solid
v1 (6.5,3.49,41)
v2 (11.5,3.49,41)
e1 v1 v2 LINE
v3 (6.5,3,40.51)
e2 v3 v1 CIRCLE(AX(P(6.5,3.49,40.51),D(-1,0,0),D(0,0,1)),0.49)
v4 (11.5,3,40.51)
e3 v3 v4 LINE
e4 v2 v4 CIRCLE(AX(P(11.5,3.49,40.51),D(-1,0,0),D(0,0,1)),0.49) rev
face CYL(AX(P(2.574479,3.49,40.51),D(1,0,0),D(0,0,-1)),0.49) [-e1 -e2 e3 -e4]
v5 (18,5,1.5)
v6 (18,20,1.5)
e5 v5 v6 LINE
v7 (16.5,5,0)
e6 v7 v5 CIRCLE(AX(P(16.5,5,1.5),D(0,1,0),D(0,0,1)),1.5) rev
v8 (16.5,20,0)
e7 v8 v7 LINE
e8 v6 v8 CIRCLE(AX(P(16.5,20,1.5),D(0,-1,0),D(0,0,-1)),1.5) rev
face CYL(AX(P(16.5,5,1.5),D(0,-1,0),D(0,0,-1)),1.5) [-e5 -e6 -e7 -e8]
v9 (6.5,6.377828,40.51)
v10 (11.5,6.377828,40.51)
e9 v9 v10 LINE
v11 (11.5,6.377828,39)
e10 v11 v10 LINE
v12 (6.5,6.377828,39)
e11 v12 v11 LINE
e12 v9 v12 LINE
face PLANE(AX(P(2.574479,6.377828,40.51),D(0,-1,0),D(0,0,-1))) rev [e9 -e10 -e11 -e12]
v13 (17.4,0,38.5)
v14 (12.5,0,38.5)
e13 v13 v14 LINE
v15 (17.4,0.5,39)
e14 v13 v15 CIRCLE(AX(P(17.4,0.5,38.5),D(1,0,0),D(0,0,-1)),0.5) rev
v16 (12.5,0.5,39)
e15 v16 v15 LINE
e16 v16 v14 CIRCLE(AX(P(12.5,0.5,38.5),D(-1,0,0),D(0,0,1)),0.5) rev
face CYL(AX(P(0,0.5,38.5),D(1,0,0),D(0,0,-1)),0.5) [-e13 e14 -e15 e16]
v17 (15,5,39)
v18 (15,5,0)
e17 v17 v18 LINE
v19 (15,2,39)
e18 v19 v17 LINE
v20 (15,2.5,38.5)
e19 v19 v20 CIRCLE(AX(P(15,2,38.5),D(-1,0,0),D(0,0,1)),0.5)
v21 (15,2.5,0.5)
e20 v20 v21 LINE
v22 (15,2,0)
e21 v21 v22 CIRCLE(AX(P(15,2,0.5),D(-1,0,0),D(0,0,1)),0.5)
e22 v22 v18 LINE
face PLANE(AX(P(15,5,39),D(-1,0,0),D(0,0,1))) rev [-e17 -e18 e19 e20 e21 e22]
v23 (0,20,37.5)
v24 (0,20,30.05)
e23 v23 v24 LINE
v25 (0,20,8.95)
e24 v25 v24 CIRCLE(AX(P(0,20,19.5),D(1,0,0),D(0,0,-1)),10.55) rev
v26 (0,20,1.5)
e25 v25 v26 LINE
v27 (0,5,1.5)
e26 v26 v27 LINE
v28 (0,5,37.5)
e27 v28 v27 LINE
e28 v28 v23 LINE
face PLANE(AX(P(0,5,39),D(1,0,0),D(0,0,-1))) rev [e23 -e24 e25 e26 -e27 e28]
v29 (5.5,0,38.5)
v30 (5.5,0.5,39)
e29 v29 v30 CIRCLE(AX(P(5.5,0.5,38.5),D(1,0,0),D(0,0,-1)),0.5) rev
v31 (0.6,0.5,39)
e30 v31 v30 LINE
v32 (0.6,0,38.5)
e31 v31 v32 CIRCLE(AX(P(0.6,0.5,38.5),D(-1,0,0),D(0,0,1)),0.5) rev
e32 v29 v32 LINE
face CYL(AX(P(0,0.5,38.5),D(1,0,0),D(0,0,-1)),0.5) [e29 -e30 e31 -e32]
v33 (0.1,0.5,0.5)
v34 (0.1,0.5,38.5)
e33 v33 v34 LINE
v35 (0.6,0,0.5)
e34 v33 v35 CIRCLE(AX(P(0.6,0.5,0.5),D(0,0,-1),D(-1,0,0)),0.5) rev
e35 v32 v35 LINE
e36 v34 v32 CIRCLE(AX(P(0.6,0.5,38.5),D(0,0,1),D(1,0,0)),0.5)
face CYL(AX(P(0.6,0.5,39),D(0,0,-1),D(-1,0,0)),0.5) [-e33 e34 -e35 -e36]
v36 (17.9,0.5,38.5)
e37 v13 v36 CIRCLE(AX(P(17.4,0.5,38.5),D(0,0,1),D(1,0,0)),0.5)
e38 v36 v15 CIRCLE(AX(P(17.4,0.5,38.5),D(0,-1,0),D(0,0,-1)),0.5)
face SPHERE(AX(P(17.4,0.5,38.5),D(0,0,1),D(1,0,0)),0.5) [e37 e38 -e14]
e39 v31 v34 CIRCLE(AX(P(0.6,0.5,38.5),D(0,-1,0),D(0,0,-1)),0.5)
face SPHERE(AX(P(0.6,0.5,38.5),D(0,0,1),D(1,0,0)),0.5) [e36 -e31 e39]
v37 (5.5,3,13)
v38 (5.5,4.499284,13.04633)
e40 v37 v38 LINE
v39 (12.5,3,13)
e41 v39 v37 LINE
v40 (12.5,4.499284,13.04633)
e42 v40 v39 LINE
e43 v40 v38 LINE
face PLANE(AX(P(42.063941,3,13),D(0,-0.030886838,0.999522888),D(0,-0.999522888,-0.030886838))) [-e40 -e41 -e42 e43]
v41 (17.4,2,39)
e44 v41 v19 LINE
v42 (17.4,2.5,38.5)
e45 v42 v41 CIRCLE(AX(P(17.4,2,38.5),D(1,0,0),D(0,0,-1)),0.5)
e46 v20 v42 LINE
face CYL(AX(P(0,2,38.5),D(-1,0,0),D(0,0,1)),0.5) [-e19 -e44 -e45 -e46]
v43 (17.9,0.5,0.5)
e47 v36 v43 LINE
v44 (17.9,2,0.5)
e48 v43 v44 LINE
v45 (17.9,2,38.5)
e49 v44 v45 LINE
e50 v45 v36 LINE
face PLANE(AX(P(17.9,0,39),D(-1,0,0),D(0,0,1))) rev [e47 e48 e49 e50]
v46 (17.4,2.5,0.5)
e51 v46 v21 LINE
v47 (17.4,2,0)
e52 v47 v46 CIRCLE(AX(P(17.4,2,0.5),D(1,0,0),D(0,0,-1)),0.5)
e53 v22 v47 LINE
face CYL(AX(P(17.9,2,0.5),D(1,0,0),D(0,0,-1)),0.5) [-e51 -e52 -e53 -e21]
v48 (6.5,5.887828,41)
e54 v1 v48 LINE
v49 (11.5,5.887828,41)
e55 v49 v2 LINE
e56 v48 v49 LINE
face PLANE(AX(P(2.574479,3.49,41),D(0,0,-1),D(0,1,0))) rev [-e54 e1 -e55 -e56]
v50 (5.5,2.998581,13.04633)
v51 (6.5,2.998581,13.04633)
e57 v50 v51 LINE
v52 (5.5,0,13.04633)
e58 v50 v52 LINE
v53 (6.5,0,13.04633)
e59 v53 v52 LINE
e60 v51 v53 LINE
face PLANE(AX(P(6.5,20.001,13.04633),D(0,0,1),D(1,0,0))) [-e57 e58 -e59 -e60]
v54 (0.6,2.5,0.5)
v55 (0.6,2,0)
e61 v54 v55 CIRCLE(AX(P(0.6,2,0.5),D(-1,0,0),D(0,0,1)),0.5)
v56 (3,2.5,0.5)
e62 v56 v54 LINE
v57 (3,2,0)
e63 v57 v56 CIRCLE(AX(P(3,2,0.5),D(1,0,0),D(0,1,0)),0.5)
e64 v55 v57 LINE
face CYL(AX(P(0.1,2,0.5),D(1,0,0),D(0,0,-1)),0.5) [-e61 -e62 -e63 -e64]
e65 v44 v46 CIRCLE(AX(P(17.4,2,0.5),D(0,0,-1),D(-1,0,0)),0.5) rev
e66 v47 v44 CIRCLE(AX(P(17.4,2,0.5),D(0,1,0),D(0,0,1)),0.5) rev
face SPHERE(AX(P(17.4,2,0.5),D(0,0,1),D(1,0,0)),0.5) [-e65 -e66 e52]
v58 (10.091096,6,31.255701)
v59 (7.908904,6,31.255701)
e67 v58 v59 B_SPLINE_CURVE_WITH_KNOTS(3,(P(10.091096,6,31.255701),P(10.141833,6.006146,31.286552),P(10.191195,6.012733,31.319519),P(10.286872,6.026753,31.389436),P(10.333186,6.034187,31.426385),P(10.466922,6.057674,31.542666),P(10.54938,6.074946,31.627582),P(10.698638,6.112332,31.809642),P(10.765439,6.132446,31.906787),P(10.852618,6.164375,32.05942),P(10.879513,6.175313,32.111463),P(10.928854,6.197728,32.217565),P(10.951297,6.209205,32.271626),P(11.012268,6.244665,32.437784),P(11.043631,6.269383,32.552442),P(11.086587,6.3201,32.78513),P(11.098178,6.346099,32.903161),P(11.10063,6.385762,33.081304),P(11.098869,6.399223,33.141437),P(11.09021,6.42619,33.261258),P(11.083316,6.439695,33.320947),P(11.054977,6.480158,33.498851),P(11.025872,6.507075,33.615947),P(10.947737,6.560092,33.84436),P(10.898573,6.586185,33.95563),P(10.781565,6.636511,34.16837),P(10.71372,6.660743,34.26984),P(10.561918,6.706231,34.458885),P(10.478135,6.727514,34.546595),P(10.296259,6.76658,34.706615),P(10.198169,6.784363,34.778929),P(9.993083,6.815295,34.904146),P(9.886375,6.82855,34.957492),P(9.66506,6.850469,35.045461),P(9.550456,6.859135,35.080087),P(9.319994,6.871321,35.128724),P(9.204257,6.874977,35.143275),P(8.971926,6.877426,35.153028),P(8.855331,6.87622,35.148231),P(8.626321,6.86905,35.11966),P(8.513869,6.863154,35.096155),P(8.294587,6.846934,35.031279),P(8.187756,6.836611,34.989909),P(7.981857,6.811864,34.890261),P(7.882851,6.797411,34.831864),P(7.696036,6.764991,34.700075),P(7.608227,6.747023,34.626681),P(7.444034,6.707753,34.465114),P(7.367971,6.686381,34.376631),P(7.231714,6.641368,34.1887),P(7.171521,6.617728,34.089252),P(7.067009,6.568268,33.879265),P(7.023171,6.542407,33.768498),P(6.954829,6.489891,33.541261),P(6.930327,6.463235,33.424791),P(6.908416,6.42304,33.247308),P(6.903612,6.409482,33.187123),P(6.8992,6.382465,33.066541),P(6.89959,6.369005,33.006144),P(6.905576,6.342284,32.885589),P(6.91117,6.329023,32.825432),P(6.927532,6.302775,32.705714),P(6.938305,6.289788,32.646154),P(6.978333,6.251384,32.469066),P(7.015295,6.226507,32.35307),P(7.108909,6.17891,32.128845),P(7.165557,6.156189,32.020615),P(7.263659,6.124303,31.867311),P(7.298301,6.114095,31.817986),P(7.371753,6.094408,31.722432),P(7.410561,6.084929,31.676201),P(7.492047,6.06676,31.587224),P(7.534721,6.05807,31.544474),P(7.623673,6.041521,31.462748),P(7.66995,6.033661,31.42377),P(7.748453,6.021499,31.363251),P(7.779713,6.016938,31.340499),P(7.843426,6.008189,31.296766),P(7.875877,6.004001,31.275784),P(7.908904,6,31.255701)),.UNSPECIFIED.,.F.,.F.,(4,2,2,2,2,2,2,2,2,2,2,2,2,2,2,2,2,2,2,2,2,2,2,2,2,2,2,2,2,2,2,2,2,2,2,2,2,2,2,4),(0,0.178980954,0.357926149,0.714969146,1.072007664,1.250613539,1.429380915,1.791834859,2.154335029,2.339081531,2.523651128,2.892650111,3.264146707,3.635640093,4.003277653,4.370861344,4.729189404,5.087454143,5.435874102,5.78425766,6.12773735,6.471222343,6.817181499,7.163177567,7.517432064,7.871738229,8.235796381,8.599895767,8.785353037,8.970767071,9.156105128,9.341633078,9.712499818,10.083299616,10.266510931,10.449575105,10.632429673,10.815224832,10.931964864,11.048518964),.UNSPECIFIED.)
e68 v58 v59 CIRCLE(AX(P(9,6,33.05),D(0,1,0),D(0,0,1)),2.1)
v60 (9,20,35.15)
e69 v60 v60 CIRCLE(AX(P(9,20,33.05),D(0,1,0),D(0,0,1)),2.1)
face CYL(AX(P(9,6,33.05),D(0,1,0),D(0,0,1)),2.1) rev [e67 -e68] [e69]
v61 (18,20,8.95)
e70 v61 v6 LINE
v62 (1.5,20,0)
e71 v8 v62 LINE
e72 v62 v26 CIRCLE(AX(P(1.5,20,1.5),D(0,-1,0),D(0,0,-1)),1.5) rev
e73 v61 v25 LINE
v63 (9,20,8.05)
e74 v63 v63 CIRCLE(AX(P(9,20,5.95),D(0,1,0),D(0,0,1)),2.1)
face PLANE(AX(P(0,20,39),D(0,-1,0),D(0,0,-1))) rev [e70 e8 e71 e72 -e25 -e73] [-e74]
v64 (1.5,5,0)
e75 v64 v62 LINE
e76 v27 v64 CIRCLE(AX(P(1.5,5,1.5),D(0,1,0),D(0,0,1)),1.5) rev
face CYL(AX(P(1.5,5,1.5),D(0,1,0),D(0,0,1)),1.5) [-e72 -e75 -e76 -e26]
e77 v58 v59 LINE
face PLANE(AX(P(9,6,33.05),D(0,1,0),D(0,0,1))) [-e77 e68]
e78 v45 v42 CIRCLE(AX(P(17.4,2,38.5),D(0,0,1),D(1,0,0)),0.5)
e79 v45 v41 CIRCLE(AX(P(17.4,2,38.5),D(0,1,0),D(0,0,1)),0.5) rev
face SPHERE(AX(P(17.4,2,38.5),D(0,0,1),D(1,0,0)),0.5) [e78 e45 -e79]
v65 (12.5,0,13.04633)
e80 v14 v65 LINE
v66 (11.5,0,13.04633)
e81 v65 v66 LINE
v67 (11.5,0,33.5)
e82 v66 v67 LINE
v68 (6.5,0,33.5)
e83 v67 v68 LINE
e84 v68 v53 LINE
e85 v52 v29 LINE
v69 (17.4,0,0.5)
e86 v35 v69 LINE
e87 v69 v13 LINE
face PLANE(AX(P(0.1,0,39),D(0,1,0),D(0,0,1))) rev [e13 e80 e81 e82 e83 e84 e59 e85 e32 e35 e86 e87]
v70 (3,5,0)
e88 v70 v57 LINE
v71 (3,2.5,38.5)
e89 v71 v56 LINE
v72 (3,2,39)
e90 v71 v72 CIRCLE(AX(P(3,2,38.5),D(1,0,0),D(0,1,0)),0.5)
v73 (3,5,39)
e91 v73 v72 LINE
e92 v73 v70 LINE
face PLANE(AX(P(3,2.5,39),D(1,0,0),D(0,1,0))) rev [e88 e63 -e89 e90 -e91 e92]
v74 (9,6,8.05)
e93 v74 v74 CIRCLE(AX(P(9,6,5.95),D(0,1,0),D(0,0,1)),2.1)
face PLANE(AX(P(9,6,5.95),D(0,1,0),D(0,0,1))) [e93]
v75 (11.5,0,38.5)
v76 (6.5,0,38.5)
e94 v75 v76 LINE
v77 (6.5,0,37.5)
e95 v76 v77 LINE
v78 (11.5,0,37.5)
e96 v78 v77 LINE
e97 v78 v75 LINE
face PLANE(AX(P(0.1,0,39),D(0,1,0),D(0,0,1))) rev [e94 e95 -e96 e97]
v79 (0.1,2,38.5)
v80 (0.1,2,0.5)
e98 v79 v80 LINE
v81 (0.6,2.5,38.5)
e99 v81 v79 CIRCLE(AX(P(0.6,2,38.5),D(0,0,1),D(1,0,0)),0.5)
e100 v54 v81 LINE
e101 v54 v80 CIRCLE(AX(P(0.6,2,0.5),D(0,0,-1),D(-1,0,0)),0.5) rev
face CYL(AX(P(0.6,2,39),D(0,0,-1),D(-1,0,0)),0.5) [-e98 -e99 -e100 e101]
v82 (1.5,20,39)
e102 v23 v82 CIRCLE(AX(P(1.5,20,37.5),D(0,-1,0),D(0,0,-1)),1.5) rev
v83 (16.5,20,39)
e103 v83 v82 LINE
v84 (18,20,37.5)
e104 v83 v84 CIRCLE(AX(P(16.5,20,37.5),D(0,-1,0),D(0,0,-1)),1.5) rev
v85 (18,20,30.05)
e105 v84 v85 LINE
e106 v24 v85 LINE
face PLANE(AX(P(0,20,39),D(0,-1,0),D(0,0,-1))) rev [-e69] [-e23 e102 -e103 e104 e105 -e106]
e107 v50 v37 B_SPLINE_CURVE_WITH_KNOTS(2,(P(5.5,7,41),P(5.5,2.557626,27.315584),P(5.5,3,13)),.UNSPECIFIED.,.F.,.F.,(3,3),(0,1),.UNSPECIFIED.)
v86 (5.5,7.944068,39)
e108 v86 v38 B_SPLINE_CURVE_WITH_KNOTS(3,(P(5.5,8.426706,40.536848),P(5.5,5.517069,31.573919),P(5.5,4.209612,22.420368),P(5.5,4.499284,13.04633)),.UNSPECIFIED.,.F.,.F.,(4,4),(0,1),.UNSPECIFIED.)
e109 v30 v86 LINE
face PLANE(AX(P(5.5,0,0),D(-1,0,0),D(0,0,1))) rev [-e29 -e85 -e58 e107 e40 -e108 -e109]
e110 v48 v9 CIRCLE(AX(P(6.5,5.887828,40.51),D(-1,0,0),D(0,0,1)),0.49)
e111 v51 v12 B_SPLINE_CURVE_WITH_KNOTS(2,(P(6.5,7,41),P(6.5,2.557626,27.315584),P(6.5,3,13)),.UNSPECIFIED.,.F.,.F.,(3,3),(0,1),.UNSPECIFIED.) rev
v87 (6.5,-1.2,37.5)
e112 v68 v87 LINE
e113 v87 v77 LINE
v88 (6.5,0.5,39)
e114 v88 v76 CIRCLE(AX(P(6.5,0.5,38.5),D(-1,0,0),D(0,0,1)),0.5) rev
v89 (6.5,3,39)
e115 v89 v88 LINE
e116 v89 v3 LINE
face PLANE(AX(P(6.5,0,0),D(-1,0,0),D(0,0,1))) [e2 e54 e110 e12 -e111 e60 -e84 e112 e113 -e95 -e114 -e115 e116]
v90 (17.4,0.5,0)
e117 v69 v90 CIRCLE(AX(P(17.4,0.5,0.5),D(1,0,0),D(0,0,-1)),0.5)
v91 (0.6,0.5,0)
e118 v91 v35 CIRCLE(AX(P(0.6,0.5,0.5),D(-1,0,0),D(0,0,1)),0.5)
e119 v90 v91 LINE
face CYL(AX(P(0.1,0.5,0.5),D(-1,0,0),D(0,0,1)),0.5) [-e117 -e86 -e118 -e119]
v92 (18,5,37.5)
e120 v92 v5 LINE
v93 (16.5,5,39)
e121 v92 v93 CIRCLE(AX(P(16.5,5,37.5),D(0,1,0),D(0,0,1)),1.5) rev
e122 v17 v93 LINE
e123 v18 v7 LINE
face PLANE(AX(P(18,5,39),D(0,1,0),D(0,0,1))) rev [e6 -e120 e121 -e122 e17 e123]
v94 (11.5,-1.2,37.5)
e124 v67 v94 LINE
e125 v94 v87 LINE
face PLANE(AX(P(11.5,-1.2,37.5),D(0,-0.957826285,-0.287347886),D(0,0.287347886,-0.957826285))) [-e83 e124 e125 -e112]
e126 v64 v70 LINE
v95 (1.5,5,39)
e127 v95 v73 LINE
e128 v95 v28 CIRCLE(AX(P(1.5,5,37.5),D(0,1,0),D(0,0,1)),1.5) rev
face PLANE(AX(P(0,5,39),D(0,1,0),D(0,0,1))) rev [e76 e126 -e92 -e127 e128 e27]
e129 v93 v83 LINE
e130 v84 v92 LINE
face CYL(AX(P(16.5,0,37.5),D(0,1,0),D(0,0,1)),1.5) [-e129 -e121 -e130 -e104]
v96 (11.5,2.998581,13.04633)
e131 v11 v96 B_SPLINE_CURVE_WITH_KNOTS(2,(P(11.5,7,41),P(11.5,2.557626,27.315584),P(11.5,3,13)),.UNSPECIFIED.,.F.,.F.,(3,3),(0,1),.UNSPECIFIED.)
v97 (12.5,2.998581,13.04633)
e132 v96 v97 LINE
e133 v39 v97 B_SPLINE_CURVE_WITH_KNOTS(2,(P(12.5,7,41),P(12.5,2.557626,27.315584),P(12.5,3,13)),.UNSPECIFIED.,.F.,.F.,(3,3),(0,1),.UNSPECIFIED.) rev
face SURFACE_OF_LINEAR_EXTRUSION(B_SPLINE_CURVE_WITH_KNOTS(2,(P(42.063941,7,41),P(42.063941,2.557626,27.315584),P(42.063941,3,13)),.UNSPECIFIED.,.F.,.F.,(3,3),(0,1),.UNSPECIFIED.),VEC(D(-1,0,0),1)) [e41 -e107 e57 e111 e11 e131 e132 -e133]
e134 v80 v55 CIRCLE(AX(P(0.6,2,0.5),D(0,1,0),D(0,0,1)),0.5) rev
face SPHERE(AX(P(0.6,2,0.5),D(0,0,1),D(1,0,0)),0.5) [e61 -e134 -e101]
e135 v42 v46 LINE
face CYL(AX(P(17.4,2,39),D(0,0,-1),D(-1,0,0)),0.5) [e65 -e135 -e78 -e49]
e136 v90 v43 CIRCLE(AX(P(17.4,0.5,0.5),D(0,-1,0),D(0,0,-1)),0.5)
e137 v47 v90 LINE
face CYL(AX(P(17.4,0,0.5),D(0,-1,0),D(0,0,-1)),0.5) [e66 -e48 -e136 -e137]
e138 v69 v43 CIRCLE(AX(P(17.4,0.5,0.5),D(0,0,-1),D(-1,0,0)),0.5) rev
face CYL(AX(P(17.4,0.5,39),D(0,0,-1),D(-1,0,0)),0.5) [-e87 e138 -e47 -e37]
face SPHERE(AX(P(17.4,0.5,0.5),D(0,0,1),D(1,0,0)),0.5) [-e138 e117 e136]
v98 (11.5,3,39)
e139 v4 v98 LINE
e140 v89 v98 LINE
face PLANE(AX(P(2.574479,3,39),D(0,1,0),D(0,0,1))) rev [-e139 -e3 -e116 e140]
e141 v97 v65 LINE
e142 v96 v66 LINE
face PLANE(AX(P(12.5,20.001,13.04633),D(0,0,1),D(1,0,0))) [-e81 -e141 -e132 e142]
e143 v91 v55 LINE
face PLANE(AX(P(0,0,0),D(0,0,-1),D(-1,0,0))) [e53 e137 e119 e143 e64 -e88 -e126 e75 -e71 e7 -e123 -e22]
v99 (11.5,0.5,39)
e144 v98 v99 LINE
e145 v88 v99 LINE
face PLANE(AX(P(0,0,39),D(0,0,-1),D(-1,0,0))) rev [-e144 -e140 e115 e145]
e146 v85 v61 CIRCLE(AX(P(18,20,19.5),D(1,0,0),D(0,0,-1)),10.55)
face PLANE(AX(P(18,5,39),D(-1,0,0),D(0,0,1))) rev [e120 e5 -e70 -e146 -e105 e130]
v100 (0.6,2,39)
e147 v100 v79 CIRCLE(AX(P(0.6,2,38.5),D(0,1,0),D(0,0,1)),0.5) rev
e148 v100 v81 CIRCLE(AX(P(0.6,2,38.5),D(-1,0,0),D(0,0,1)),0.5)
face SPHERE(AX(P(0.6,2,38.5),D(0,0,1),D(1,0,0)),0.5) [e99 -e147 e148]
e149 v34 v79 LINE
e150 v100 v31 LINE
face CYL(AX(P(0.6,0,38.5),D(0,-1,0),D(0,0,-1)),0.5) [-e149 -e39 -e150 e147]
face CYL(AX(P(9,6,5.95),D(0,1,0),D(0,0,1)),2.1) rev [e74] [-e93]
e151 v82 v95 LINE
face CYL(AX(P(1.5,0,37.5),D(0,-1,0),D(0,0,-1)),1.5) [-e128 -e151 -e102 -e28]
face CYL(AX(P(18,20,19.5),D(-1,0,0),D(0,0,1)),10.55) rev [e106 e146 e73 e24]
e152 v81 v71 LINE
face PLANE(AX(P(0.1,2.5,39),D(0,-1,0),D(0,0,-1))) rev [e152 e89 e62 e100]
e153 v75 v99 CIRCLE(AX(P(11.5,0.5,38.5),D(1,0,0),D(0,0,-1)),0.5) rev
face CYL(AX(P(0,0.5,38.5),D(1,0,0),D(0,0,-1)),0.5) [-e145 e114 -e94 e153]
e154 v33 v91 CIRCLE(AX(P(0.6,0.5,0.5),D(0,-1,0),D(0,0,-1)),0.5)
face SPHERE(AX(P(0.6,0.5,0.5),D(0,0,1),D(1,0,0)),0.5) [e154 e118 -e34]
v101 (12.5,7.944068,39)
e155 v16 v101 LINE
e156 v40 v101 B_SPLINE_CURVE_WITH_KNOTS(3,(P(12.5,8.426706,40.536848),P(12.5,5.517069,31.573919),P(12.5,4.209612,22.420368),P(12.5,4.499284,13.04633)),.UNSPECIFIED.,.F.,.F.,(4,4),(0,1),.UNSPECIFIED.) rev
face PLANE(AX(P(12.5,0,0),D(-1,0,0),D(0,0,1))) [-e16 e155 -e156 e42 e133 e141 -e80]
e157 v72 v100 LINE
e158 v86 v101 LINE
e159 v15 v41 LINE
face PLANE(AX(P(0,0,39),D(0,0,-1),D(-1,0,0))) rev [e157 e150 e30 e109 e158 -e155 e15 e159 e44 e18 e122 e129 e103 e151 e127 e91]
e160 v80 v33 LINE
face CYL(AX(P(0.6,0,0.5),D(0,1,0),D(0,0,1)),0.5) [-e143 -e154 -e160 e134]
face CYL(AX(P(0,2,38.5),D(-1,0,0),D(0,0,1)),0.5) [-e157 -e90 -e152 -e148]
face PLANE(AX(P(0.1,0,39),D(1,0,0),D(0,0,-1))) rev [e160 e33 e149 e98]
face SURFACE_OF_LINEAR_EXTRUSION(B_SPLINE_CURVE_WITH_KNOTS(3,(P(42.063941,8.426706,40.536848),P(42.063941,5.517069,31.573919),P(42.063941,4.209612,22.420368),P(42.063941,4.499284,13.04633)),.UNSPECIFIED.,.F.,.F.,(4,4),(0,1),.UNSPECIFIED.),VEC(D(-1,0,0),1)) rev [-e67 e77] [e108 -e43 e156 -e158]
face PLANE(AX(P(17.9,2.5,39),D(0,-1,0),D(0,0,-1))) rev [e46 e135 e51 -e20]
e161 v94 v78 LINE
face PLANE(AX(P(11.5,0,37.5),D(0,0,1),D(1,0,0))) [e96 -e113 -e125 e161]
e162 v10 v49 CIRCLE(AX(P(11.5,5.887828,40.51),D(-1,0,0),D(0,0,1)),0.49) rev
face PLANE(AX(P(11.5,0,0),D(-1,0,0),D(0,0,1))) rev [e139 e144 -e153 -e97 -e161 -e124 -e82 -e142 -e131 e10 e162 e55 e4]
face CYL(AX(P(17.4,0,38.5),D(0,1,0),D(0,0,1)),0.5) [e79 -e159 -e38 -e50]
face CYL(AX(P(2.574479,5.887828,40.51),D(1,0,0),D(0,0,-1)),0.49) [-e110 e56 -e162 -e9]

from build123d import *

# Parameters (mm, degrees)
BOSS_EXTRUDE1_DEPTH             = 39
HANDLEBARHOLE_R                 = 10.55
CUT_EXTRUDE1_DEPTH              = 48.381430962
SKETCH3_R                       = 2.1
CUT_EXTRUDE2_DEPTH              = 14
BOSS_EXTRUDE2_DEPTH             = 2.5
BOSS_EXTRUDE2_DEPTH_BACK        = 2.5
FILLET1_R                       = 0.5
CUT_EXTRUDE_THIN2_START         = -3.5
CUT_EXTRUDE_THIN2_DEPTH         = 7
CUT_EXTRUDE5_REACH              = 49.381
SKETCH10_W                      = 1
SKETCH10_H                      = 25.953669743
BOSS_EXTRUDE3_REACH             = 46.744
BOSS_EXTRUDE3_DIRECTION_2_REACH = 46.744
FILLET5_R                       = 1.5


# Read off the part's stored shape, not the designer's step: Cut-Extrude-Thin2
with BuildPart() as part:
    # Sketch1 → Boss-Extrude1 (new body)
    with BuildSketch(Plane.XY):
        Polygon((0, 5), (0, 20), (18, 20), (18, 5), (15, 5), (15, 2.5), (17.9, 2.5), (17.9, 0), (0.1, 0), (0.1, 2.5), (3, 2.5), (3, 5), align=None)
    extrude(amount=BOSS_EXTRUDE1_DEPTH)

    # HandlebarHole → Cut-Extrude1 (cut, through all)
    with BuildSketch(Plane(origin=(0, 0, 0), x_dir=(0, 0, -1), z_dir=(1, 0, 0))):
        with Locations((-19.5, 20)):
            Circle(HANDLEBARHOLE_R)
    extrude(amount=CUT_EXTRUDE1_DEPTH, mode=Mode.SUBTRACT)

    # Sketch3 → Cut-Extrude2 (cut)
    with BuildSketch(Plane(origin=(0, 20, 0), x_dir=(1, 0, 0), z_dir=(0, 1, 0))):
        with Locations(Location((9, -5.95, 0), (0, 0, 270))):
            Circle(SKETCH3_R)
        with Locations(Location((9, -33.05, 0), (0, 0, 270))):
            Circle(SKETCH3_R)
    extrude(amount=-CUT_EXTRUDE2_DEPTH, mode=Mode.SUBTRACT)

    # Sketch4 → Boss-Extrude2 (add, two sides: drawn at the far end of the back side and taken through both)
    with BuildSketch(Plane.ZY.offset(-9).offset(-BOSS_EXTRUDE2_DEPTH_BACK)):
        Polygon((33.5, 0), (37.5, 0), (37.5, -1.2), align=None)
    extrude(amount=BOSS_EXTRUDE2_DEPTH + BOSS_EXTRUDE2_DEPTH_BACK)

    # Fillet1
    fillet1_edges = [part.edges().sort_by_distance(p)[0] for p in [
        (17.9, 1.25, 39),
        (1.55, 2.5, 0),
        (16.45, 2.5, 39),
        (16.45, 2.5, 0),
        (17.9, 1.25, 0),
        (9, 0, 0),
        (0.1, 1.25, 0),
        (0.1, 2.5, 19.5),
        (17.9, 2.5, 19.5),
        (17.9, 0, 19.5),
        (0.1, 0, 19.5),
        (1.55, 2.5, 39),
        (0.1, 1.25, 39),
        (9, 0, 39),
    ]]
    fillet(fillet1_edges, radius=FILLET1_R)

    # Cut-Extrude-Thin2 outline → Cut-Extrude-Thin2 (cut)
    with BuildSketch(Plane.ZY.offset(-9).offset(CUT_EXTRUDE_THIN2_START)):
        with BuildLine():
            add(Edge.make_bspline(
                [(39, 6.377827527), (26.271218228, 2.589898365), (13, 3)],
                knots=[0.07295309, 0.07295309, 0.07295309, 1, 1, 1], degree=2))
            Line((39, 6.377827527), (39.000000003, 7.944068421))
            add(Edge.make_bspline(
                [(39.000000003, 7.944068421), (36.434479895, 7.165477311), (33.853278683, 6.517493693), (31.255701113, 6)],
                knots=[0.057086213, 0.057086213, 0.057086213, 0.057086213, 0.342626571, 0.342626571, 0.342626571, 0.342626571], degree=3))
            add(Edge.make_bspline(
                [(31.255701113, 6), (25.275536046, 4.808621641), (19.208573603, 4.308861265), (13.046330257, 4.499284332)],
                knots=[0.342626571, 0.342626571, 0.342626571, 0.342626571, 1, 1, 1, 1], degree=3))
            Line((13.046330257, 4.499284332), (13, 3))
        make_face()
    extrude(amount=CUT_EXTRUDE_THIN2_DEPTH, mode=Mode.SUBTRACT)

    # Sketch10 → Cut-Extrude5 (cut, up to next)
    with BuildSketch(Plane(origin=(0, 0, 0), x_dir=(1, 0, 0), z_dir=(0, 1, 0)), mode=Mode.PRIVATE) as cut_extrude5_sk1:
        with Locations((12, -26.023165129)):
            Rectangle(SKETCH10_W, SKETCH10_H)
    cut_extrude5_tool1 = extrude(cut_extrude5_sk1.sketch, amount=CUT_EXTRUDE5_REACH, mode=Mode.PRIVATE) & part.part
    # Sketch10 → Cut-Extrude5 (cut, up to next)
    with BuildSketch(Plane(origin=(0, 0, 0), x_dir=(1, 0, 0), z_dir=(0, 1, 0)), mode=Mode.PRIVATE) as cut_extrude5_sk2:
        with Locations((6, -26.023165129)):
            Rectangle(SKETCH10_W, SKETCH10_H)
    cut_extrude5_tool2 = extrude(cut_extrude5_sk2.sketch, amount=CUT_EXTRUDE5_REACH, mode=Mode.PRIVATE) & part.part
    add(cut_extrude5_tool1.solids().sort_by_distance((12, 0, 26.023165))[0], mode=Mode.SUBTRACT)
    add(cut_extrude5_tool2.solids().sort_by_distance((6, 0, 26.023165))[0], mode=Mode.SUBTRACT)

    # Boss-Extrude3: up to this face of the body (flat: up to its plane)
    boss_extrude3_end = Plane(part.part.faces().sort_by_distance((6.5, 2.064317156, 28.033592375))[0])
    # Sketch11 → Boss-Extrude3 (add, up to the picked face)
    with BuildSketch(Plane.ZY.offset(-9), mode=Mode.PRIVATE) as boss_extrude3_sk1:
        with BuildLine():
            Line((39, 3), (40.51, 3))
            ThreePointArc((40.51, 3), (40.856482323, 3.143517677), (41, 3.49))
            Line((41, 3.49), (41, 5.887827527))
            ThreePointArc((41, 5.887827527), (40.856482323, 6.23430985), (40.51, 6.377827527))
            Line((40.51, 6.377827527), (39, 6.377827527))
            Line((39, 6.377827527), (39, 3))
        make_face()
    boss_extrude3_tool1 = split(extrude(boss_extrude3_sk1.sketch, amount=BOSS_EXTRUDE3_REACH, mode=Mode.PRIVATE), bisect_by=boss_extrude3_end, keep=Keep.BOTH, mode=Mode.PRIVATE)
    add(boss_extrude3_tool1.solids().sort_by(Axis((9, 4.688914, 39.986205), (-1, 0, 0)))[0])

    # Boss-Extrude3 direction 2: up to this face of the body (flat: up to its plane)
    boss_extrude3_direction_2_end = Plane(part.part.faces().sort_by_distance((11.5, 2.064317156, 28.033592375))[0])
    # Sketch11 → Boss-Extrude3 direction 2 (add, up to the picked face)
    with BuildSketch(Plane.ZY.offset(-9), mode=Mode.PRIVATE) as boss_extrude3_direction_2_sk1:
        with BuildLine():
            Line((39, 3), (40.51, 3))
            ThreePointArc((40.51, 3), (40.856482323, 3.143517677), (41, 3.49))
            Line((41, 3.49), (41, 5.887827527))
            ThreePointArc((41, 5.887827527), (40.856482323, 6.23430985), (40.51, 6.377827527))
            Line((40.51, 6.377827527), (39, 6.377827527))
            Line((39, 6.377827527), (39, 3))
        make_face()
    boss_extrude3_direction_2_tool1 = split(extrude(boss_extrude3_direction_2_sk1.sketch, amount=-BOSS_EXTRUDE3_DIRECTION_2_REACH, mode=Mode.PRIVATE), bisect_by=boss_extrude3_direction_2_end, keep=Keep.BOTH, mode=Mode.PRIVATE)
    add(boss_extrude3_direction_2_tool1.solids().sort_by(Axis((9, 4.688914, 39.986205), (1, 0, 0)))[0])

    # Fillet5
    fillet5_edges = [part.edges().sort_by_distance(p)[0] for p in [
        (0, 12.5, 0),
        (18, 12.5, 0),
        (18, 12.5, 39),
        (0, 12.5, 39),
    ]]
    fillet(fillet5_edges, radius=FILLET5_R)


solid = part.part
